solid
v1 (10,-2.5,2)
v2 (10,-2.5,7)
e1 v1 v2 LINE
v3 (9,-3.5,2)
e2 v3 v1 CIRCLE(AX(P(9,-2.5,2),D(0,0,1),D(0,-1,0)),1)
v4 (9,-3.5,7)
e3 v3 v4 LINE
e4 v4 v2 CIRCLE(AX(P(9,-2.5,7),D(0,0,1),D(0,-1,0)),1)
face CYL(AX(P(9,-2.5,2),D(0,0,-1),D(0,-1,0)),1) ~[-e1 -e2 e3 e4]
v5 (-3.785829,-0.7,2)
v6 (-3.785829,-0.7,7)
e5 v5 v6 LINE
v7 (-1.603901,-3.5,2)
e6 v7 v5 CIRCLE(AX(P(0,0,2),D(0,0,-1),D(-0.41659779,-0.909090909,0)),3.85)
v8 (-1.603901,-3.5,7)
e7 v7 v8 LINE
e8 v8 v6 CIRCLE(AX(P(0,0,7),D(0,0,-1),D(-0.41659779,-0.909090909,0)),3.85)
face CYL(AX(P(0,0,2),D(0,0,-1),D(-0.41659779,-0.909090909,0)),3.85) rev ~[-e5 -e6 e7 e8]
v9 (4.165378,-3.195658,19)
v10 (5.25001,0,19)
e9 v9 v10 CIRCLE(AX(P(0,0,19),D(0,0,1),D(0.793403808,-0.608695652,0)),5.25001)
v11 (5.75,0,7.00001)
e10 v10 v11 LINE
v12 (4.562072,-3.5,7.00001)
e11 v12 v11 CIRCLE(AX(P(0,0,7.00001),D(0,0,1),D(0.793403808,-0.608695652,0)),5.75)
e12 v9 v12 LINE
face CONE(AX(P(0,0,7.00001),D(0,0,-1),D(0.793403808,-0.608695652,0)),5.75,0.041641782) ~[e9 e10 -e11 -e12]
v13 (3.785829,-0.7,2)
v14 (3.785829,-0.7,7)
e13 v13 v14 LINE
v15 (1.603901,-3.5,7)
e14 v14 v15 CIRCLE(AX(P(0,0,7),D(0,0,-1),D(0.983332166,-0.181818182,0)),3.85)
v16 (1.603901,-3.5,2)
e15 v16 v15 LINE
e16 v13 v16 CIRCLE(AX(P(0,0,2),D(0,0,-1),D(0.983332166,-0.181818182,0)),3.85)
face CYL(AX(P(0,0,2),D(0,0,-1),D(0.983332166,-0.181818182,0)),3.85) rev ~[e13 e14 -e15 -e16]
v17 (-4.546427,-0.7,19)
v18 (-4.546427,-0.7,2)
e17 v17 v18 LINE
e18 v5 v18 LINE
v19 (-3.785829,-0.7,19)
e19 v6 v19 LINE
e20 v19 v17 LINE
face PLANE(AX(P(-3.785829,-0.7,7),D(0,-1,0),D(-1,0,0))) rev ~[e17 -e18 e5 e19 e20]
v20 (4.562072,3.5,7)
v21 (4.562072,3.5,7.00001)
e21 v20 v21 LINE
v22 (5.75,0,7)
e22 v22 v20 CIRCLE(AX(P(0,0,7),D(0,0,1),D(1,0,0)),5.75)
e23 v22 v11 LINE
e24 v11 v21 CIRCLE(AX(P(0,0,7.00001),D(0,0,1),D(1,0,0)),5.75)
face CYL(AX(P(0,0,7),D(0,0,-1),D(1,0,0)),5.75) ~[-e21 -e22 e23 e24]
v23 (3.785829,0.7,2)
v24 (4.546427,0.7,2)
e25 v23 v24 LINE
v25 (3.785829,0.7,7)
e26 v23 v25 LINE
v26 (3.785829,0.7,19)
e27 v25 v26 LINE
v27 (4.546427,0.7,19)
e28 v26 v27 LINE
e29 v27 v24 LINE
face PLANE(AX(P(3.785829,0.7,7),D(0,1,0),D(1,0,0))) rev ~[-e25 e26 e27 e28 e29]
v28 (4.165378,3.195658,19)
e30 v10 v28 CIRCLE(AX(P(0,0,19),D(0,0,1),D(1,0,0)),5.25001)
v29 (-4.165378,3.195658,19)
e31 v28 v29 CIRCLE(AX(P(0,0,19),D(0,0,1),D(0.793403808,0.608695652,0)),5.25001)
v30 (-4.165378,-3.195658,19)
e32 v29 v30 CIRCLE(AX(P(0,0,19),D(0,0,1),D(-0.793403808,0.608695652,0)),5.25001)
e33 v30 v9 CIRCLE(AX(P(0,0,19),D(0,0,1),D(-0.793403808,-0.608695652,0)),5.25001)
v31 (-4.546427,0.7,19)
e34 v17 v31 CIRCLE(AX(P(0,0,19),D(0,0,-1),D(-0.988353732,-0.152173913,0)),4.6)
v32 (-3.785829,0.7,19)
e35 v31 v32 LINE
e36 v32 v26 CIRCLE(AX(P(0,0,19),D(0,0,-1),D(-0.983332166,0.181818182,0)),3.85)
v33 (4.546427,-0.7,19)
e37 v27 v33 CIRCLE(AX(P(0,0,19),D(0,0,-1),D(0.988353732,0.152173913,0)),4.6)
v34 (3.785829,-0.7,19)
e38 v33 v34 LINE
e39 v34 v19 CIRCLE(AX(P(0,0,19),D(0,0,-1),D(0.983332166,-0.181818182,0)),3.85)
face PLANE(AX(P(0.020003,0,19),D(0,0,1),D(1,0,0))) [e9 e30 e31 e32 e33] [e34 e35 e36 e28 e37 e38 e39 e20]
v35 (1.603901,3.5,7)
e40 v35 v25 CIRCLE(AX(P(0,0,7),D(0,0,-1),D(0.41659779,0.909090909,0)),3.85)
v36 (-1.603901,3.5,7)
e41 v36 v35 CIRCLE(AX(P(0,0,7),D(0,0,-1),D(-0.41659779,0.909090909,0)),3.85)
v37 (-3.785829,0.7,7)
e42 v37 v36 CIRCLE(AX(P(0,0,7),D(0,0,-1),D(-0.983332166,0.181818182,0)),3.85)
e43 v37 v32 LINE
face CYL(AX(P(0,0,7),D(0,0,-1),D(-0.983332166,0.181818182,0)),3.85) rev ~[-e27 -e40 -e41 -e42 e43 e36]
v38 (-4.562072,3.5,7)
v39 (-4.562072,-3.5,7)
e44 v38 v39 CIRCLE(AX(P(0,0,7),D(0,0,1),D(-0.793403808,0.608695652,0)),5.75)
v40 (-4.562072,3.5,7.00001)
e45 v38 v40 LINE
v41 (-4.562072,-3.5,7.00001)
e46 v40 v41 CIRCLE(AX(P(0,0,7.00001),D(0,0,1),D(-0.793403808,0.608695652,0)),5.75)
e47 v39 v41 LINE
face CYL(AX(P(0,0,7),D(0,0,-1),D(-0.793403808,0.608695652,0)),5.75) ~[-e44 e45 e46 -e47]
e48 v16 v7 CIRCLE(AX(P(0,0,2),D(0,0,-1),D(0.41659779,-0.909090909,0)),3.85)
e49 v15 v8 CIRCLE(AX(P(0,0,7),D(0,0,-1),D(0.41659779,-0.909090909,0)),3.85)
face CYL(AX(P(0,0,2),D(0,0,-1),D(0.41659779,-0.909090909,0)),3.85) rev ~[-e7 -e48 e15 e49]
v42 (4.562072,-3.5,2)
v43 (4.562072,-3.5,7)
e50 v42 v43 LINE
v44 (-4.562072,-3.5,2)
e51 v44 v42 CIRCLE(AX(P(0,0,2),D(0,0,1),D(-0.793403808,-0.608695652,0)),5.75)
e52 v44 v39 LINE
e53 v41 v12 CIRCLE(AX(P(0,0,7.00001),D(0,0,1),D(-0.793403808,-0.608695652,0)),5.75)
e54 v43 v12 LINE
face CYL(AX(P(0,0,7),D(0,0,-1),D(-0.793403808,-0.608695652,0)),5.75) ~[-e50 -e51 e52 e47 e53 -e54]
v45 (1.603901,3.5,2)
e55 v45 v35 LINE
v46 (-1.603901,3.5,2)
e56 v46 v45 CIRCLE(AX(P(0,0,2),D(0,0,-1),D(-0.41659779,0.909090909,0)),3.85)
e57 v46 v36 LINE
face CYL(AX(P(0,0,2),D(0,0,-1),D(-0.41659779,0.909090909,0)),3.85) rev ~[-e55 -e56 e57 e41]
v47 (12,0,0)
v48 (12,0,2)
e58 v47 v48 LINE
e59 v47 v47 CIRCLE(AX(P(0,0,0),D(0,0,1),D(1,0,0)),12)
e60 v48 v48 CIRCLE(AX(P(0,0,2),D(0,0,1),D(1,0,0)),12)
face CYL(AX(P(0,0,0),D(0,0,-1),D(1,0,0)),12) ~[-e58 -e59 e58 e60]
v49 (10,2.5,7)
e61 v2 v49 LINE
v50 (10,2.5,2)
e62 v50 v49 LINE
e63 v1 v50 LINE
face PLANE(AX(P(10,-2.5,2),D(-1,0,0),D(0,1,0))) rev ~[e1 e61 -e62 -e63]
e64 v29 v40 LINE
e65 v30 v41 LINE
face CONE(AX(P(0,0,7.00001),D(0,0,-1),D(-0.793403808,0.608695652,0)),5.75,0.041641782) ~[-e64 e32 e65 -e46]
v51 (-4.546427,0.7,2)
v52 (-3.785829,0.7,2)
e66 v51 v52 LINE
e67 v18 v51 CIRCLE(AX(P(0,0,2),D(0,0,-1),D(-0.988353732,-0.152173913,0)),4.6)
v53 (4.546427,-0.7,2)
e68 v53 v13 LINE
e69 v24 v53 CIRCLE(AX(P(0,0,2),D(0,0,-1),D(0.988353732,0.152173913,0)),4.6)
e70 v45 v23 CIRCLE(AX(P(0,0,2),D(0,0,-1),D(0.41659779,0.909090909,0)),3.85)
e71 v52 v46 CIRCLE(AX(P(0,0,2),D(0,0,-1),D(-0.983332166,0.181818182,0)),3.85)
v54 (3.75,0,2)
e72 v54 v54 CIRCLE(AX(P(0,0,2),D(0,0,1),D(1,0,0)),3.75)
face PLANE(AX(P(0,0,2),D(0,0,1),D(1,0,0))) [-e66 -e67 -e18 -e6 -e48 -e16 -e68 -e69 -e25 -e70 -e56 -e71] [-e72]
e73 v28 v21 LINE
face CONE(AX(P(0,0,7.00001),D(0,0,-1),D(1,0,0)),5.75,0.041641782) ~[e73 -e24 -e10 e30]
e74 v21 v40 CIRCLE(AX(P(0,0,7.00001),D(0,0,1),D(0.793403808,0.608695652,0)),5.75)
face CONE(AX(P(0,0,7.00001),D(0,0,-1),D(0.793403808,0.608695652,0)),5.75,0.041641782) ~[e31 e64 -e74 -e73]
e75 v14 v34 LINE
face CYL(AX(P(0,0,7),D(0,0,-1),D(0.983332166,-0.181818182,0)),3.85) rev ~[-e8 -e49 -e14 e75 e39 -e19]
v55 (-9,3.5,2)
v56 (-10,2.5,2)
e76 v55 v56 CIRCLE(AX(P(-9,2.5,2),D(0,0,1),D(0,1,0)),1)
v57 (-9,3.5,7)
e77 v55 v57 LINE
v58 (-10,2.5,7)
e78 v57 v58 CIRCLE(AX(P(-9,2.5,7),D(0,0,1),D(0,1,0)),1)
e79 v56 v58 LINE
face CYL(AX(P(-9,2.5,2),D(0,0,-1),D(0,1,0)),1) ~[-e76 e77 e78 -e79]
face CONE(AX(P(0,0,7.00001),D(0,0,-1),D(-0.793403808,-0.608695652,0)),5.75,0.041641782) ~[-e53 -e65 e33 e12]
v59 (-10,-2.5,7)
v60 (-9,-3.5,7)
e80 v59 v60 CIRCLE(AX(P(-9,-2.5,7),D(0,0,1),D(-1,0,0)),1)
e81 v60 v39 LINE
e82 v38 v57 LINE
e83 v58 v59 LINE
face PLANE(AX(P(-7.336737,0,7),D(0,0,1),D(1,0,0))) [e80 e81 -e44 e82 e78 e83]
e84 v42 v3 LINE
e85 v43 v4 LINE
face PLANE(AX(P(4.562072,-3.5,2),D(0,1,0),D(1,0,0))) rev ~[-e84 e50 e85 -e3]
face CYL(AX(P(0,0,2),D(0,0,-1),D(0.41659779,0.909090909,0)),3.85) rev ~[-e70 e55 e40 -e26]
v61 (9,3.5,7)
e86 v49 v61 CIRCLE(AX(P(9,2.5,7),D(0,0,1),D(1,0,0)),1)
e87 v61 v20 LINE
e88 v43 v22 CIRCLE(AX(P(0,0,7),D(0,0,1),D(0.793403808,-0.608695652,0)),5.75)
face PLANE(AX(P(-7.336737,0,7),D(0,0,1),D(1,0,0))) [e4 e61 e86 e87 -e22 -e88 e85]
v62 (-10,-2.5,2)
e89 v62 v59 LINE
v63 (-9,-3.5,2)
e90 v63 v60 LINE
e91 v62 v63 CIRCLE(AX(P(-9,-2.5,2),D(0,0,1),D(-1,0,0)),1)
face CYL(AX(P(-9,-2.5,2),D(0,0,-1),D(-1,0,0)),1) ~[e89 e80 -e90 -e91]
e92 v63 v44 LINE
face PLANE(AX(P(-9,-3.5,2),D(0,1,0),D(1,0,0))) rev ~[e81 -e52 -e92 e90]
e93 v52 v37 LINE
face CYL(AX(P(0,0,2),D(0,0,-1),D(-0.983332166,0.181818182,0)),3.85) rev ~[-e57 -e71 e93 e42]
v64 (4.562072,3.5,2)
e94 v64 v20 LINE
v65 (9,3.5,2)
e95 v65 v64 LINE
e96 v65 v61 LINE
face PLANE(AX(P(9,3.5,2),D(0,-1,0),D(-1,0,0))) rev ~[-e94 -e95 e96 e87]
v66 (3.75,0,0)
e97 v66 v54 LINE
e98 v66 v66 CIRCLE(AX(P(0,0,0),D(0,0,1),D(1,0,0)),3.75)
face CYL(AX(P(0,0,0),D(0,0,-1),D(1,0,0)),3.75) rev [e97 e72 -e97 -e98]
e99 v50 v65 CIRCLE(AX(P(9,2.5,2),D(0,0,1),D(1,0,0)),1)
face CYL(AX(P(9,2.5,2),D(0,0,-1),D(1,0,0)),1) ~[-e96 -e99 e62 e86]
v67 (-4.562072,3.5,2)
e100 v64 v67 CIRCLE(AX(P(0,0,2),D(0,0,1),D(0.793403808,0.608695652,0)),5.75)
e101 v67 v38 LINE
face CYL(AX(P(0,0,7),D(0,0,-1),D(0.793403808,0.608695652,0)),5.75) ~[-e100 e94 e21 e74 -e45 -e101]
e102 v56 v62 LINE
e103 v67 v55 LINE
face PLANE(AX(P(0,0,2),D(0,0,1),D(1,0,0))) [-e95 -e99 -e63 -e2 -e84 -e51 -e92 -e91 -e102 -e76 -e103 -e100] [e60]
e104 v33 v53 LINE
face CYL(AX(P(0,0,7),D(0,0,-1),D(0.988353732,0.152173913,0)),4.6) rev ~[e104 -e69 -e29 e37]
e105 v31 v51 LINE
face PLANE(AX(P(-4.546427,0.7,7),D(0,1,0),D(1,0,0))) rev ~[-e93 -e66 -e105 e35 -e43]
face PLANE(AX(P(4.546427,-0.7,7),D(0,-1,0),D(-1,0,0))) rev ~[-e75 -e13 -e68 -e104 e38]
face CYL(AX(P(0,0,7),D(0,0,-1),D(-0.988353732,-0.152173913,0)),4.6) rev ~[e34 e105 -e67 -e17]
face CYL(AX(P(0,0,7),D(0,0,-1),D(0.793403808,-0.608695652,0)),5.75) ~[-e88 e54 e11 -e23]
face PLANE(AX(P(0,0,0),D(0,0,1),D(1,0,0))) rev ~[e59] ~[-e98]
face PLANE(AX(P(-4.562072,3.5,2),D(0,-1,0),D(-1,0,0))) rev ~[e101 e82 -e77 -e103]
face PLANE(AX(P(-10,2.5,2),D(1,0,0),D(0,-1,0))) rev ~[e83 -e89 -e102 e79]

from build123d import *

# Parameters (mm, degrees)
F0_R     = 12
F0_R_2   = 3.75
F1_DEPTH = 2
F3_DEPTH = 5
F5_DEPTH = 12
F6_SIZE2 = 11.99999
F6_SIZE  = 0.49999


# Not quite as in the source:
# - a fillet or chamfer is up to 0.001 mm smaller than in the source, because OpenCascade refuses the exact size


with BuildPart() as f1:
    # F0 (on Top) → F1 (new body)
    with BuildSketch(Plane.XY):
        Circle(F0_R)
        Circle(F0_R_2, mode=Mode.SUBTRACT)
    extrude(amount=F1_DEPTH)

    # F2 (on face) → F3 (join)
    with BuildSketch(Plane.XY.offset(2)):
        with BuildLine():
            Line((-9, -3.5), (-4.5620718977, -3.5))
            ThreePointArc((-4.5620718977, -3.5), (-5.75, 0), (-4.5620718977, 3.5))
            Line((-4.5620718977, 3.5), (-9, 3.5))
            ThreePointArc((-9, 3.5), (-9.7071067812, 3.2071067812), (-10, 2.5))
            Line((-10, 2.5), (-10, 0))
            Line((-10, 0), (-10, -2.5))
            ThreePointArc((-10, -2.5), (-9.7071067812, -3.2071067812), (-9, -3.5))
        make_face()
        with BuildLine():
            Line((-4.5620718977, -3.5), (-1.6039014932, -3.5))
            ThreePointArc((-1.6039014932, -3.5), (-3.0368237131, -2.3664745373), (-3.7858288392, -0.7))
            Line((-3.7858288392, -0.7), (-4, -0.7))
            Line((-4, -0.7), (-4.5464271687, -0.7))
            ThreePointArc((-4.5464271687, -0.7), (-4.6, 0), (-4.5464271687, 0.7))
            Line((-4.5464271687, 0.7), (-3.7858288392, 0.7))
            ThreePointArc((-3.7858288392, 0.7), (-3.0368237131, 2.3664745373), (-1.6039014932, 3.5))
            Line((-1.6039014932, 3.5), (-4.5620718977, 3.5))
            ThreePointArc((-4.5620718977, 3.5), (-5.75, 0), (-4.5620718977, -3.5))
        make_face()
        with BuildLine():
            Line((4.5620718977, -3.5), (1.6039014932, -3.5))
            ThreePointArc((1.6039014932, -3.5), (0, -3.85), (-1.6039014932, -3.5))
            Line((-1.6039014932, -3.5), (-4.5620718977, -3.5))
            ThreePointArc((-4.5620718977, -3.5), (0, -5.75), (4.5620718977, -3.5))
        make_face()
        with BuildLine():
            ThreePointArc((5.75, 0), (5.4449248577, -1.8480512152), (4.5620718977, -3.5))
            Line((4.5620718977, -3.5), (9, -3.5))
            ThreePointArc((9, -3.5), (9.7071067812, -3.2071067812), (10, -2.5))
            Line((10, -2.5), (10, 0))
            Line((10, 0), (10, 2.5))
            ThreePointArc((10, 2.5), (9.7071067812, 3.2071067812), (9, 3.5))
            Line((9, 3.5), (4.5620718977, 3.5))
            ThreePointArc((4.5620718977, 3.5), (5.4449248577, 1.8480512152), (5.75, 0))
        make_face()
        with BuildLine():
            ThreePointArc((3.7858288392, -0.7), (3.0368237131, -2.3664745373), (1.6039014932, -3.5))
            Line((1.6039014932, -3.5), (4.5620718977, -3.5))
            ThreePointArc((4.5620718977, -3.5), (5.4449248577, -1.8480512152), (5.75, 0))
            ThreePointArc((5.75, 0), (5.4449248577, 1.8480512152), (4.5620718977, 3.5))
            Line((4.5620718977, 3.5), (1.6039014932, 3.5))
            ThreePointArc((1.6039014932, 3.5), (3.0368237131, 2.3664745373), (3.7858288392, 0.7))
            Line((3.7858288392, 0.7), (4.5464271687, 0.7))
            ThreePointArc((4.5464271687, 0.7), (4.6, 0), (4.5464271687, -0.7))
            Line((4.5464271687, -0.7), (4, -0.7))
            Line((4, -0.7), (3.7858288392, -0.7))
        make_face()
        with BuildLine():
            Line((-4.5620718977, 3.5), (-1.6039014932, 3.5))
            ThreePointArc((-1.6039014932, 3.5), (0, 3.85), (1.6039014932, 3.5))
            Line((1.6039014932, 3.5), (4.5620718977, 3.5))
            ThreePointArc((4.5620718977, 3.5), (0, 5.75), (-4.5620718977, 3.5))
        make_face()
    extrude(amount=F3_DEPTH)

    # F4 (on face) → F5 (join)
    with BuildSketch(Plane.XY.offset(7)):
        with BuildLine():
            ThreePointArc((4.5620718977, -3.5), (5.4449248577, -1.8480512152), (5.75, 0))
            ThreePointArc((5.75, 0), (5.4449248577, 1.8480512152), (4.5620718977, 3.5))
            ThreePointArc((4.5620718977, 3.5), (0, 5.75), (-4.5620718977, 3.5))
            ThreePointArc((-4.5620718977, 3.5), (-5.75, 0), (-4.5620718977, -3.5))
            ThreePointArc((-4.5620718977, -3.5), (0, -5.75), (4.5620718977, -3.5))
        make_face()
        with BuildLine():
            ThreePointArc((-3.7858288392, 0.7), (0, 3.85), (3.7858288392, 0.7))
            Line((3.7858288392, 0.7), (4.5464271687, 0.7))
            ThreePointArc((4.5464271687, 0.7), (4.6, 0), (4.5464271687, -0.7))
            Line((4.5464271687, -0.7), (3.7858288392, -0.7))
            ThreePointArc((3.7858288392, -0.7), (0, -3.85), (-3.7858288392, -0.7))
            Line((-3.7858288392, -0.7), (-4.5464271687, -0.7))
            ThreePointArc((-4.5464271687, -0.7), (-4.6, 0), (-4.5464271687, 0.7))
            Line((-4.5464271687, 0.7), (-3.7858288392, 0.7))
        make_face(mode=Mode.SUBTRACT)
    extrude(amount=F5_DEPTH)

    # F6 (size 0.5 and 12 in the source; OpenCascade refuses exactly that, so slightly less here)
    f6_edges = [f1.edges().sort_by_distance(p)[0] for p in [
        (-4.562072, -3.5, 19),
    ]]
    f6_side = f1.faces().sort_by_distance((-4.433037, -3.401005, 19))[0]
    chamfer(f6_edges, length=F6_SIZE, length2=F6_SIZE2, reference=f6_side)


solid = f1.part
